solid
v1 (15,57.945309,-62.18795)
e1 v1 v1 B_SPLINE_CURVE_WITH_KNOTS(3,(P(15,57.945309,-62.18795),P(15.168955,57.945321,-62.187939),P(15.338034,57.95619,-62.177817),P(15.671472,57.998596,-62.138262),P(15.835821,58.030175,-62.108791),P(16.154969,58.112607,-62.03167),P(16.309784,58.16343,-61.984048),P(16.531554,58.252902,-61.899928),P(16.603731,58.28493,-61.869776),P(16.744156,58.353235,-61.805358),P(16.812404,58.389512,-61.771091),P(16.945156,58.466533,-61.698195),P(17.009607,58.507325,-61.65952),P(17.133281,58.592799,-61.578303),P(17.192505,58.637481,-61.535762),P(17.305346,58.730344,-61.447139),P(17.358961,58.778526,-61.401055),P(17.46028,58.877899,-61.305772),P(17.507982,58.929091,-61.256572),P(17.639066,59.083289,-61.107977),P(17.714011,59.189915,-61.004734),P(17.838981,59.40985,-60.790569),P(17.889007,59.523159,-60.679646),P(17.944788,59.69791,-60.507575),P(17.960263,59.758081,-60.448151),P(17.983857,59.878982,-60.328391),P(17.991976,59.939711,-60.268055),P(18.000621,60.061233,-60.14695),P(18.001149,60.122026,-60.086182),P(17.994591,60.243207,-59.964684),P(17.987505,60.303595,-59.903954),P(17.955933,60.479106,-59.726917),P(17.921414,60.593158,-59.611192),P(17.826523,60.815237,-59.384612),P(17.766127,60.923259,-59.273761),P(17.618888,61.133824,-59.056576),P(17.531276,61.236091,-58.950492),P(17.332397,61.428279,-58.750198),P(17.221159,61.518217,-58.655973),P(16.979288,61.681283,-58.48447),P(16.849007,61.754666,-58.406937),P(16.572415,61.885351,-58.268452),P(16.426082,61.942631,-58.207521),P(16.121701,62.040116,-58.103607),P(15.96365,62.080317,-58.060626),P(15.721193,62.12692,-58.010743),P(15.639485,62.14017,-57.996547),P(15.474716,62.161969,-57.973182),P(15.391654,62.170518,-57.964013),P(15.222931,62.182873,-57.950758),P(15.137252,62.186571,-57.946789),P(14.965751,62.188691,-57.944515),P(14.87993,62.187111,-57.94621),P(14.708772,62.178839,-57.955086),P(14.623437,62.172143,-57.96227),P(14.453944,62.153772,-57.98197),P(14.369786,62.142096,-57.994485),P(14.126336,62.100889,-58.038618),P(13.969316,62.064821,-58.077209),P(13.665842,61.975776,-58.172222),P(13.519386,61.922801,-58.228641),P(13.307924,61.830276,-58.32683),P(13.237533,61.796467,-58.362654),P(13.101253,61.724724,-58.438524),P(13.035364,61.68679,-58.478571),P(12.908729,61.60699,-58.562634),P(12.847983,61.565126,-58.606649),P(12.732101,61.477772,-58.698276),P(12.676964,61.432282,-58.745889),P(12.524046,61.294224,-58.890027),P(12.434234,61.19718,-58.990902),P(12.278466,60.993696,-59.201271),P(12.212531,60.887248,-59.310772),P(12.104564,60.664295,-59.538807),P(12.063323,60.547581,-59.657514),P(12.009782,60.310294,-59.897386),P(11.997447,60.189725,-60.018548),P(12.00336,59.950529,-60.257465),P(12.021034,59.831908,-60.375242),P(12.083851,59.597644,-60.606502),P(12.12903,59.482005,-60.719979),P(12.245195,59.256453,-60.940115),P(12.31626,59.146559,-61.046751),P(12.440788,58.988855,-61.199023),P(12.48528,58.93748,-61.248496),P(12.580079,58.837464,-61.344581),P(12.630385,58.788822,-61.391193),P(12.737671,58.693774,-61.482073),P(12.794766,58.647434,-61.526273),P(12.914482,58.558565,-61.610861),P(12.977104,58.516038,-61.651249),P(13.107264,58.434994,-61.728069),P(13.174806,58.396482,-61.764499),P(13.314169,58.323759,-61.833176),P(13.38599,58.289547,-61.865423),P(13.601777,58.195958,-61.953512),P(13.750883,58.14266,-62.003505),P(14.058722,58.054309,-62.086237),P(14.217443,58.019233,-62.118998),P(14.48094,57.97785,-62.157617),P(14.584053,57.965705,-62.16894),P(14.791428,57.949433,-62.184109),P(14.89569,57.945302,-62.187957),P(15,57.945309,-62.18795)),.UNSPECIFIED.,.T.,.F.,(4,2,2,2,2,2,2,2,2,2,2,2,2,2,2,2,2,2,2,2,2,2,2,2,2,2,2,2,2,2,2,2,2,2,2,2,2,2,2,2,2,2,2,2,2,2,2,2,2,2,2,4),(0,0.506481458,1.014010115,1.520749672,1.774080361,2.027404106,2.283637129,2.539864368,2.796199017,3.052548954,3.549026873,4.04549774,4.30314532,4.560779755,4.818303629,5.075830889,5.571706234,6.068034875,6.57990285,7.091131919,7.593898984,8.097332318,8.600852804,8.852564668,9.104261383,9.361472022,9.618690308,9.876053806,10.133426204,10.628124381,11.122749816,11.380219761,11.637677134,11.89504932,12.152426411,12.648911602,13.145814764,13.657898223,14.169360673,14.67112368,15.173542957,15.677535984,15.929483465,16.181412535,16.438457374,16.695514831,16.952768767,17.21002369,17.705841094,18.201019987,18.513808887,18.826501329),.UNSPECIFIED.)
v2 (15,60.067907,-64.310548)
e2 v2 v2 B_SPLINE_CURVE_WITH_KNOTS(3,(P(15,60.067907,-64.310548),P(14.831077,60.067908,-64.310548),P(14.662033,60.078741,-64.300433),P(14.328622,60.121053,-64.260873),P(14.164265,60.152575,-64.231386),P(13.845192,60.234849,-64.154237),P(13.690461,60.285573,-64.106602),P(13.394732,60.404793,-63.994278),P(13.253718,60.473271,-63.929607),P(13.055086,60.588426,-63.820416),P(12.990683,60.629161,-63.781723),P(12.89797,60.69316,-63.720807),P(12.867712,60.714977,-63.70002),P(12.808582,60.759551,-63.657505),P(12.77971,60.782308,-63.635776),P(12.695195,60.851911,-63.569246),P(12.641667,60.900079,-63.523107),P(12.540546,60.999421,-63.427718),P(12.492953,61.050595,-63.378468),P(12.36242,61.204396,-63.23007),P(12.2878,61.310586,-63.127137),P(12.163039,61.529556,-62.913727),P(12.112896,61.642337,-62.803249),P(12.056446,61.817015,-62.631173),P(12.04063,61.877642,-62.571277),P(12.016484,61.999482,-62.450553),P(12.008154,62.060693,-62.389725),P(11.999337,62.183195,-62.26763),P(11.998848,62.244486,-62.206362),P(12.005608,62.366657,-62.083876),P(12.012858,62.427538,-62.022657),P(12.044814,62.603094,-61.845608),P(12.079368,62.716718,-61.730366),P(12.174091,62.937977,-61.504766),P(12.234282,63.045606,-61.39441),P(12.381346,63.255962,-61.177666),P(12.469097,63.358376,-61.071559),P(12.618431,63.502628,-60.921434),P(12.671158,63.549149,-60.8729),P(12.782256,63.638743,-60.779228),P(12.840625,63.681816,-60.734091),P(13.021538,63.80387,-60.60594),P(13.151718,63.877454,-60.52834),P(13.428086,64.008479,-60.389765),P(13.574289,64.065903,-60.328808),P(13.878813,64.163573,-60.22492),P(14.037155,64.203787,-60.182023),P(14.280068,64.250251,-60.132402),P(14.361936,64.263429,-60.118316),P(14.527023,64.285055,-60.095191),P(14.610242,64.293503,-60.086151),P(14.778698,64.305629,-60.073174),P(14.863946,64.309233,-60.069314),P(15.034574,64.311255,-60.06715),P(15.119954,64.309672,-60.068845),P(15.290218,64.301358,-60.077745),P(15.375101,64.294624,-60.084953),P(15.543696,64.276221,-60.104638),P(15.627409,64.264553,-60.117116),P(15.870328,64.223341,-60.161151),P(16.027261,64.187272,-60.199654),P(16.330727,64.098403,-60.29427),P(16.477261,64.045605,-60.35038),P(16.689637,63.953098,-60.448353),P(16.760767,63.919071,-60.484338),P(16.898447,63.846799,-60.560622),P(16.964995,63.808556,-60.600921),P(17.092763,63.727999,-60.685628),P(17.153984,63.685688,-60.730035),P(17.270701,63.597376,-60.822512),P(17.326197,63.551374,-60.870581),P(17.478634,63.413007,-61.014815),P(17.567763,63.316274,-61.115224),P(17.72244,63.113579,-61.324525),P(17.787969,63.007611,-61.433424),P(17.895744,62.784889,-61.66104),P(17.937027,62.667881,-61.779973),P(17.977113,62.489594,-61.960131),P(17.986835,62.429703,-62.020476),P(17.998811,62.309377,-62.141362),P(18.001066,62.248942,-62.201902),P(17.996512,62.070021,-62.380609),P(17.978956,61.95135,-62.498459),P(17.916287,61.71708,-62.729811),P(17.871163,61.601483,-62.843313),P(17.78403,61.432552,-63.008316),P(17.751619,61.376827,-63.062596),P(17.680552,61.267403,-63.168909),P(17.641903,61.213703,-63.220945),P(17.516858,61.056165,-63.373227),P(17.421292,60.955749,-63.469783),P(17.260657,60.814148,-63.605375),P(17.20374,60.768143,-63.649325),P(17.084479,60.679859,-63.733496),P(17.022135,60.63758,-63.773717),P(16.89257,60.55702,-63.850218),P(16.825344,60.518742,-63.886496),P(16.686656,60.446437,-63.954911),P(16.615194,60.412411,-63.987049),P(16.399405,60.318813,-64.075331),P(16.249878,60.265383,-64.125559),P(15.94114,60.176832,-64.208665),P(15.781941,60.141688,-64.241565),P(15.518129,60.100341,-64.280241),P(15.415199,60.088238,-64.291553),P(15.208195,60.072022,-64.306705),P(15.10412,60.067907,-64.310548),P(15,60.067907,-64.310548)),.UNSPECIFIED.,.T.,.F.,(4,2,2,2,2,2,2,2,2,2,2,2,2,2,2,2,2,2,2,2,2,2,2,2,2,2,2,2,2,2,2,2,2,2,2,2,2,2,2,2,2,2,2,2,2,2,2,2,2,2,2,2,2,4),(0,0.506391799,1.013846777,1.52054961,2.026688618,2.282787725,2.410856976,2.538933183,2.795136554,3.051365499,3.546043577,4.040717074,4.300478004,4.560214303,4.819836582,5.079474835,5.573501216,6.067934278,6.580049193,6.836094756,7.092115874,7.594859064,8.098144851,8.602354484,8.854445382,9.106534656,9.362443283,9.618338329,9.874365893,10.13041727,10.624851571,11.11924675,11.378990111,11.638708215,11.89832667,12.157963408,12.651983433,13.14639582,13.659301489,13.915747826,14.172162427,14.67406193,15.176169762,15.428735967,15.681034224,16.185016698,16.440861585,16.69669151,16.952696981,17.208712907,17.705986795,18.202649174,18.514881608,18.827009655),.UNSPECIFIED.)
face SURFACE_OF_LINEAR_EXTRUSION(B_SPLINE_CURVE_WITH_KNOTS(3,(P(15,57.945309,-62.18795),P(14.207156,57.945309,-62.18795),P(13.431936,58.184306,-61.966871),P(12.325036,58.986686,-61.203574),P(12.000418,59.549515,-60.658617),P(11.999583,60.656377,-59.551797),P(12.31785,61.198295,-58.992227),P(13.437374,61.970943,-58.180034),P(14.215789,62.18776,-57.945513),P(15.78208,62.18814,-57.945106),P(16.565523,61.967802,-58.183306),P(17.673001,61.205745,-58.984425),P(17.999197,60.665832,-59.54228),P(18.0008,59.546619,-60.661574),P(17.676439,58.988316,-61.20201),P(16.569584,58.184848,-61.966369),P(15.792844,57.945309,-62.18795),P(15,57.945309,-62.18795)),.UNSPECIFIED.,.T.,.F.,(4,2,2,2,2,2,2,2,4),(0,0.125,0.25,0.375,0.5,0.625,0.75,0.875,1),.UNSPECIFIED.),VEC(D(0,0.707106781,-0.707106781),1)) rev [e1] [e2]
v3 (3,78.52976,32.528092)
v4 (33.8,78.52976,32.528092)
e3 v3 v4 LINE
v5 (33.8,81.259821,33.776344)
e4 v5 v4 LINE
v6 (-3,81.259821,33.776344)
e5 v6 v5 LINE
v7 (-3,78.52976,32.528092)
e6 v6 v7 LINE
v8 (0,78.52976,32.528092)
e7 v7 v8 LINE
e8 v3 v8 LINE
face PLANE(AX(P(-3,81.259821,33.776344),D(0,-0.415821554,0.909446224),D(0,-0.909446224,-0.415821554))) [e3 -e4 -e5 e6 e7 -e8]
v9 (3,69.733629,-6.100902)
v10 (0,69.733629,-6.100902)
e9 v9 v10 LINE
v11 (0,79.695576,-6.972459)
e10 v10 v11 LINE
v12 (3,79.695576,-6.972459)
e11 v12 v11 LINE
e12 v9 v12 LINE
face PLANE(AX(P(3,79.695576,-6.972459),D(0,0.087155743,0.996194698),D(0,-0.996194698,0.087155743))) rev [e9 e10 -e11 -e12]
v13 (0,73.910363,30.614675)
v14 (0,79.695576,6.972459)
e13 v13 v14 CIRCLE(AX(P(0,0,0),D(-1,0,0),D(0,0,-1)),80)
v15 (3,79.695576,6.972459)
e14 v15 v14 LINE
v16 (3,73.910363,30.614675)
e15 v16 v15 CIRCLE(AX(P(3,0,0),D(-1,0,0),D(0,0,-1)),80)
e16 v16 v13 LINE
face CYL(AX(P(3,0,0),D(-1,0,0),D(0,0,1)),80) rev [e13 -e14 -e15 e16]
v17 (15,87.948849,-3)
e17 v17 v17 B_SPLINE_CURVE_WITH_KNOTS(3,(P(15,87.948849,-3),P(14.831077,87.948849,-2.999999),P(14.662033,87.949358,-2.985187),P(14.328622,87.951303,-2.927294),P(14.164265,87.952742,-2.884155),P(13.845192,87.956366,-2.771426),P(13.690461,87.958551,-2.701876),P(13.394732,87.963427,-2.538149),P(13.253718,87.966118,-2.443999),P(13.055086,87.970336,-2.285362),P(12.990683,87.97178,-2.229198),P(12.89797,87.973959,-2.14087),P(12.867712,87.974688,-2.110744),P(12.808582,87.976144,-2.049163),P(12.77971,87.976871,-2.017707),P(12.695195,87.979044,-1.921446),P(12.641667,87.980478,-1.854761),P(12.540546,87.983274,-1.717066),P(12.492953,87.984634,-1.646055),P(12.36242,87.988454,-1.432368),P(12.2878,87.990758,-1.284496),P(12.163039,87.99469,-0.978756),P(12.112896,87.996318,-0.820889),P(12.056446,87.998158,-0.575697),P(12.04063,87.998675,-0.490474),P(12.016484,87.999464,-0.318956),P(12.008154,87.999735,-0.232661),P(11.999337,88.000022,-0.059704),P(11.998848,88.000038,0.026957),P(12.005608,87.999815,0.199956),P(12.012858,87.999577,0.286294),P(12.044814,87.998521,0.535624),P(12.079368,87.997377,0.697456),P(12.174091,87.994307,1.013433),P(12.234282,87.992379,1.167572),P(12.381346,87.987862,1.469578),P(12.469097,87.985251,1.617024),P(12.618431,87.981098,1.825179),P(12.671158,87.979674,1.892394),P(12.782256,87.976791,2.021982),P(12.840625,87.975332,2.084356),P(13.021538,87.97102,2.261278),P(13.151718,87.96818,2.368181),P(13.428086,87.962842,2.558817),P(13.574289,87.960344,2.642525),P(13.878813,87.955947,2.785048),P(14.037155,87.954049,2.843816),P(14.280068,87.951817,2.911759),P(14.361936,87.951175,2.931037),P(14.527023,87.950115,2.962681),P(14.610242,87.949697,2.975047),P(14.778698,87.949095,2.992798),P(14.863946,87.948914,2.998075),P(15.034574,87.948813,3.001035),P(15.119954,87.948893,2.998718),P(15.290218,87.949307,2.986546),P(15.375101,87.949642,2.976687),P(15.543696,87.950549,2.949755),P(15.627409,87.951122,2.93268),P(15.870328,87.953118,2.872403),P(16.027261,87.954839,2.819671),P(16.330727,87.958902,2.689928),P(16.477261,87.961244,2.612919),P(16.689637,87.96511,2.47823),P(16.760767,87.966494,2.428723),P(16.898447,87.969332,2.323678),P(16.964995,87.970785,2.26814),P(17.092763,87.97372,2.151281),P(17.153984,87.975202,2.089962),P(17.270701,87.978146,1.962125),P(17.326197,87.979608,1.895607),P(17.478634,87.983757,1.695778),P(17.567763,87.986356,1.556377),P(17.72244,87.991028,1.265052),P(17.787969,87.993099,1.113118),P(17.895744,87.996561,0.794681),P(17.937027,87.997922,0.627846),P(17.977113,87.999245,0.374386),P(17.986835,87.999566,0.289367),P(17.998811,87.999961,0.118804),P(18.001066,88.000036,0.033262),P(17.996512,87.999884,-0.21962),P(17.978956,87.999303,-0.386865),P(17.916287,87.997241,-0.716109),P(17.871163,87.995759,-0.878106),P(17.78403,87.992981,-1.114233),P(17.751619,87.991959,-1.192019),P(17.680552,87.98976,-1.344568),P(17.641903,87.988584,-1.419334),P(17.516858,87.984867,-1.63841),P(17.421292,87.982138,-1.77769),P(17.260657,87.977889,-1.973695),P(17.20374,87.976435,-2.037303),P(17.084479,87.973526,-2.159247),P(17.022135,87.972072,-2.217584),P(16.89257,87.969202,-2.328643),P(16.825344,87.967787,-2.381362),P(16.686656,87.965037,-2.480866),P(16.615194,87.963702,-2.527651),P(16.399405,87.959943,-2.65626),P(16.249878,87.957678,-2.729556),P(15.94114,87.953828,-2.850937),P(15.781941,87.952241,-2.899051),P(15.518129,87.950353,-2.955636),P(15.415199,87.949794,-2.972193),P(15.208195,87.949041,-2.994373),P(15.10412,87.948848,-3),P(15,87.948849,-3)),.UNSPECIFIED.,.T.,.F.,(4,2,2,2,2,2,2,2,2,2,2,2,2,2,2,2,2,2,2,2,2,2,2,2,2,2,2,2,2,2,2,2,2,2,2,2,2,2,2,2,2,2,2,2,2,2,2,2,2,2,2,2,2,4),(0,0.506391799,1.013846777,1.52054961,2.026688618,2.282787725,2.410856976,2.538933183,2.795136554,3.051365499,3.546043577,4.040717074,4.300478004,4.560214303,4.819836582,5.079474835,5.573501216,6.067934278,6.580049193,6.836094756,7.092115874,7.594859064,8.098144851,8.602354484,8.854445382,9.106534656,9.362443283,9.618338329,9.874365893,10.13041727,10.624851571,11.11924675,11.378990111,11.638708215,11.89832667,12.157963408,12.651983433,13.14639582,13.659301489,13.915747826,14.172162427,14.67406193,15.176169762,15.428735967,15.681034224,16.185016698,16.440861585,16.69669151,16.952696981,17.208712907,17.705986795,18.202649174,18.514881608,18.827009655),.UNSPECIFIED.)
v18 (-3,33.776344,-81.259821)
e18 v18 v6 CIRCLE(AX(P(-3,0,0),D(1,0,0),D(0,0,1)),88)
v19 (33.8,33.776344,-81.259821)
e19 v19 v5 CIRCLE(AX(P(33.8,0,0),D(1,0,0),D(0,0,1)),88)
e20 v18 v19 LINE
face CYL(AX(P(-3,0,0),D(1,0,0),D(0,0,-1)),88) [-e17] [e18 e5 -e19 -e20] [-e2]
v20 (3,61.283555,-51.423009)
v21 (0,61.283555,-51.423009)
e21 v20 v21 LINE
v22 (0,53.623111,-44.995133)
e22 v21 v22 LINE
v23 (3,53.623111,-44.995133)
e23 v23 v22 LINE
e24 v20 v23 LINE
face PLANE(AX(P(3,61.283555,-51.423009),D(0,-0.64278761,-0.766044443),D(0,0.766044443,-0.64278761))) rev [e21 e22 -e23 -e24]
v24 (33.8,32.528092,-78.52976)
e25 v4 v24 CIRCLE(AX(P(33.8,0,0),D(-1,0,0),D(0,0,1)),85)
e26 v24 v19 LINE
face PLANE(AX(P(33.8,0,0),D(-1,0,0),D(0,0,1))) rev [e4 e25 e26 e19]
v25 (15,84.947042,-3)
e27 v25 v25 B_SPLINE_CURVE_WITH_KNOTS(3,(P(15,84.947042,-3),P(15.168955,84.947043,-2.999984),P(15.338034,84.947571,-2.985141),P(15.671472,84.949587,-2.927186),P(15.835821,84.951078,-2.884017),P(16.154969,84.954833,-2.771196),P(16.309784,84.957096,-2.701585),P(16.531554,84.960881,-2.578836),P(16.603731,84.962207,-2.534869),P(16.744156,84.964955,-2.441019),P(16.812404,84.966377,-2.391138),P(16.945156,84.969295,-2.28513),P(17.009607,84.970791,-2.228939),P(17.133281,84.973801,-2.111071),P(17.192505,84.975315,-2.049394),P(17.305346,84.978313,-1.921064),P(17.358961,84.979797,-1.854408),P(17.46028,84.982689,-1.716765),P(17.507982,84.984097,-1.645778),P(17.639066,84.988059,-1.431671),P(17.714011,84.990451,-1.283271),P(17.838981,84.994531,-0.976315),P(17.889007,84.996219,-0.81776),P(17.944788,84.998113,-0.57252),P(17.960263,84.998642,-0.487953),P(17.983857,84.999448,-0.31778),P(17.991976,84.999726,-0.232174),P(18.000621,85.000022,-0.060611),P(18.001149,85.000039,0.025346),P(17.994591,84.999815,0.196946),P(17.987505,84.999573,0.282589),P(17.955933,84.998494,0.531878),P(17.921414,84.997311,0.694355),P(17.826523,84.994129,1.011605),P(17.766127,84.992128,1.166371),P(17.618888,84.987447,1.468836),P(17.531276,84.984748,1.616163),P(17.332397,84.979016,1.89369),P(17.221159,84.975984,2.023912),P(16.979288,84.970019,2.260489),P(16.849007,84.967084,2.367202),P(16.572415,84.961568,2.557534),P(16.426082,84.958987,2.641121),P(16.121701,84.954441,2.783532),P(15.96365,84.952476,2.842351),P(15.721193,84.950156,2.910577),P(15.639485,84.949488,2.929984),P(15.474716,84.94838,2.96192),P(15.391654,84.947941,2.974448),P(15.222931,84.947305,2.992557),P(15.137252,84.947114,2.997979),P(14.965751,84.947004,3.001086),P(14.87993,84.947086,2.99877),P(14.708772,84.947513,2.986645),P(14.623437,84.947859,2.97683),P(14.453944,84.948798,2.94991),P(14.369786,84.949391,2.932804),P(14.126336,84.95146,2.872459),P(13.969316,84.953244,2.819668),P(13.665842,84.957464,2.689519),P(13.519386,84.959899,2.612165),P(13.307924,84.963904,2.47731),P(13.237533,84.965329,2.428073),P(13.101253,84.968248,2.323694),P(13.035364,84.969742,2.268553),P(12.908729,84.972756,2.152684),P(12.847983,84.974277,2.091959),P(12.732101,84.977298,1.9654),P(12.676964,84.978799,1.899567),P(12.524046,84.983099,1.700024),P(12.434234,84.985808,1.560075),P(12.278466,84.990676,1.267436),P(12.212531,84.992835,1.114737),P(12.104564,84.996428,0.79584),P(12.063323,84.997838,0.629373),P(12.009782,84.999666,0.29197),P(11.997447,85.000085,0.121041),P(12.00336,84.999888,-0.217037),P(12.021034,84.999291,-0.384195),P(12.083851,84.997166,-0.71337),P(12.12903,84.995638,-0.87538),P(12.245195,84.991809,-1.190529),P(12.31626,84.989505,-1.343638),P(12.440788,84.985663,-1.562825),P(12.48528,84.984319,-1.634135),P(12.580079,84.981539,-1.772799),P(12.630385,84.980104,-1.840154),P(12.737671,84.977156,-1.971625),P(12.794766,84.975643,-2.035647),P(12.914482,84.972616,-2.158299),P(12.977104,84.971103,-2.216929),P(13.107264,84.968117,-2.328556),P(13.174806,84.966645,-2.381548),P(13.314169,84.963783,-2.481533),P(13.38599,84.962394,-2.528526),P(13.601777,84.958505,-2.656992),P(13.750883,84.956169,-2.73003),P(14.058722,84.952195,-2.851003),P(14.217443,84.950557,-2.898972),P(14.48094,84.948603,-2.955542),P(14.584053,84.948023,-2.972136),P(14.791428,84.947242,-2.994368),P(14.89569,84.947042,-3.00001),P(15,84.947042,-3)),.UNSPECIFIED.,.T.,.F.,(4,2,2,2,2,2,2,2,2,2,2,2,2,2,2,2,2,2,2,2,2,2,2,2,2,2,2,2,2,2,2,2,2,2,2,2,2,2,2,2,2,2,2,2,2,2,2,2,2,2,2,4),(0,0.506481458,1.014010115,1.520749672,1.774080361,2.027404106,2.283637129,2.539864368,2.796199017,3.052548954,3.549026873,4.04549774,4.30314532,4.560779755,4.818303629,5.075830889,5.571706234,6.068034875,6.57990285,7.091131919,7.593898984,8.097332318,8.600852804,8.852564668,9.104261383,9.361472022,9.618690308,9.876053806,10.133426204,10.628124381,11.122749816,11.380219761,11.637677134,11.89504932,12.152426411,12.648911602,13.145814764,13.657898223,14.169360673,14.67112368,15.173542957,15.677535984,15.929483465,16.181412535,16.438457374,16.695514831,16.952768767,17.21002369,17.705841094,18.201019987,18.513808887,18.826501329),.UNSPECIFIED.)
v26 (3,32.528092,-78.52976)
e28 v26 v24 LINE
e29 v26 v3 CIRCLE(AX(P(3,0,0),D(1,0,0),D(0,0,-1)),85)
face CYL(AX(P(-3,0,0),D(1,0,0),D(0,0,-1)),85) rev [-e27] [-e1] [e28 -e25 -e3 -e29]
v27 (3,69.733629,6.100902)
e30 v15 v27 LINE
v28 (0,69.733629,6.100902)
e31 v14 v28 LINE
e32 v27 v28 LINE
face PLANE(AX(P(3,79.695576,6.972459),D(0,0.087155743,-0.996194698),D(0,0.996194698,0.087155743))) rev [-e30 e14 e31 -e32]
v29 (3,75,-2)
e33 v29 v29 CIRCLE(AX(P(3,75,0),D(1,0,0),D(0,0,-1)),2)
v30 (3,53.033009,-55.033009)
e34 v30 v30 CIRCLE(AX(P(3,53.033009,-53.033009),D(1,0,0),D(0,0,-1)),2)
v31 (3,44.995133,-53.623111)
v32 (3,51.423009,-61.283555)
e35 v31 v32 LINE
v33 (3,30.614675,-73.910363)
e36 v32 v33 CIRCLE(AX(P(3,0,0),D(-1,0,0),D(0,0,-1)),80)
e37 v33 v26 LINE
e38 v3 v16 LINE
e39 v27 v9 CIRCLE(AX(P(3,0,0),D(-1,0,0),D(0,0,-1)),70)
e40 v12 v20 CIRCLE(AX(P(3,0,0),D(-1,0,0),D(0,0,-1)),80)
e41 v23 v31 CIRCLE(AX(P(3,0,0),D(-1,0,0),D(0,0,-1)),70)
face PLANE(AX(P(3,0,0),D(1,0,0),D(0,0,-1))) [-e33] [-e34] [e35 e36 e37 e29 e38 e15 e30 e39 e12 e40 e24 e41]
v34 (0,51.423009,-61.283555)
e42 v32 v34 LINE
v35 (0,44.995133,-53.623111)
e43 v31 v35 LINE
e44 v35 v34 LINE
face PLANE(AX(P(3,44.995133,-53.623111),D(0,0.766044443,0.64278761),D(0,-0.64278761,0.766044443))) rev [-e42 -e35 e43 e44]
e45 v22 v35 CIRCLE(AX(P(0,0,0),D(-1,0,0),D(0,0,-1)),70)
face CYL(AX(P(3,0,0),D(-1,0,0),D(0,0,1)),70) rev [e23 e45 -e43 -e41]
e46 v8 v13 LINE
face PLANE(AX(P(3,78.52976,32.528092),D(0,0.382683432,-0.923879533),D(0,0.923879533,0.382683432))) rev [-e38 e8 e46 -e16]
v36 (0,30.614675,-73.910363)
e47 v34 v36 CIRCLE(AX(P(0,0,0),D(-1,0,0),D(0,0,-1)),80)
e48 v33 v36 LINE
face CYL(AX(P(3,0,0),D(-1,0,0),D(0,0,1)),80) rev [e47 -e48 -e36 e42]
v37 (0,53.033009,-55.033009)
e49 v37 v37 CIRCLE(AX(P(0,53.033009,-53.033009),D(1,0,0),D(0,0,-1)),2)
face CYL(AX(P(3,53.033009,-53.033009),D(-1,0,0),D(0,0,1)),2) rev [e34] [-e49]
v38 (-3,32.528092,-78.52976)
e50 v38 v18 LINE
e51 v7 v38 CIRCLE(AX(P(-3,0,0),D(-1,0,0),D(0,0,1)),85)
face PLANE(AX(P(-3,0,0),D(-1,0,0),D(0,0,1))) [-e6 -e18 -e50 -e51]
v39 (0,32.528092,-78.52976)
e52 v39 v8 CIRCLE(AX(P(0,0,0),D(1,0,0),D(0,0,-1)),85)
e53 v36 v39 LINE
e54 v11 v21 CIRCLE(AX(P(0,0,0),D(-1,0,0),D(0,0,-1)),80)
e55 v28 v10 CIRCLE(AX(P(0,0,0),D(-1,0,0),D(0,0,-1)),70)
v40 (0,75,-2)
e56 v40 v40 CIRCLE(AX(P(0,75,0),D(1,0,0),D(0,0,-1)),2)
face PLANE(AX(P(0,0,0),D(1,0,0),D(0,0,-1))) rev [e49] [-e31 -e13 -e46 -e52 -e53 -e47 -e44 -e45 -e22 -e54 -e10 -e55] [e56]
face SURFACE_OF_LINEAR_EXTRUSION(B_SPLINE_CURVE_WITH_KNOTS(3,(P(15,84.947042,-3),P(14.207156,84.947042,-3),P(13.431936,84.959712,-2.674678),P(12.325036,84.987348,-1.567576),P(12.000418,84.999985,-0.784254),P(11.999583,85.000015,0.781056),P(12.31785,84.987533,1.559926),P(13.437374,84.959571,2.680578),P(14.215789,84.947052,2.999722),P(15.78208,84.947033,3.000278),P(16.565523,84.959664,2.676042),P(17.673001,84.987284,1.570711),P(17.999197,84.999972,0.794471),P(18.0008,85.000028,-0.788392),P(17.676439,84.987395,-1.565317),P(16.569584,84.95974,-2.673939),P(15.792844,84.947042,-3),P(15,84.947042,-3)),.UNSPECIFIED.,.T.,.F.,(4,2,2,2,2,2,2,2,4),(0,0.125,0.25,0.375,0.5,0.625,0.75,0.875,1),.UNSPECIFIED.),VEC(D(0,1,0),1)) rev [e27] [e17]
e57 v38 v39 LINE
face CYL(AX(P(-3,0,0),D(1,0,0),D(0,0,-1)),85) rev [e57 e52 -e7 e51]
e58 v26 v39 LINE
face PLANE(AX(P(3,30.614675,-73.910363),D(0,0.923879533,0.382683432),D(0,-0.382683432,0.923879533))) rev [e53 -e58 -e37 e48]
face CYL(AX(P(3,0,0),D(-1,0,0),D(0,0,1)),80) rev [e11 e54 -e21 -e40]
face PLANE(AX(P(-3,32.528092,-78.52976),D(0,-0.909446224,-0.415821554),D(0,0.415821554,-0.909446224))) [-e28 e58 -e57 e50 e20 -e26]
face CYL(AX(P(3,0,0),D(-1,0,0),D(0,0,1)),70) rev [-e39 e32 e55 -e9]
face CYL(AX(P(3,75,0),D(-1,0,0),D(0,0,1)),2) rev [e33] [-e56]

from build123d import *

# Parameters (mm, degrees)
SKETCH5_R                = 2
BOSS_EXTRUDE2_DEPTH      = 3
BOSS_EXTRUDE3_DEPTH      = 30.8
BOSS_EXTRUDE3_DEPTH_BACK = 6
CUT_EXTRUDE1_START       = 84.947042212
CUT_EXTRUDE1_DEPTH       = 3.052957992
CIRPATTERN1_COUNT        = 8


# Read off the part's stored shape, not the designer's step: Cut-Extrude1
with BuildPart() as part:
    # Sketch5 → Boss-Extrude2 (new body)
    with BuildSketch(Plane(origin=(0, 0, 0), x_dir=(0, 0, -1), z_dir=(1, 0, 0))):
        with BuildLine():
            Line((-32.528091751, 78.529760263), (-30.614674589, 73.910362601))
            ThreePointArc((-30.614674589, 73.910362601), (-19.014871386, 77.707365585), (-6.97245942, 79.695575847))
            Line((-6.97245942, 79.695575847), (-6.100901992, 69.733628866))
            ThreePointArc((-6.100901992, 69.733628866), (0, 70), (6.100901992, 69.733628866))
            Line((6.100901992, 69.733628866), (6.97245942, 79.695575847))
            ThreePointArc((6.97245942, 79.695575847), (30.614674589, 73.910362601), (51.423008775, 61.28355545))
            Line((51.423008775, 61.28355545), (44.995132678, 53.623111018))
            ThreePointArc((44.995132678, 53.623111018), (49.497474683, 49.497474683), (53.623111018, 44.995132678))
            Line((53.623111018, 44.995132678), (61.28355545, 51.423008775))
            ThreePointArc((61.28355545, 51.423008775), (68.392949654, 41.501860653), (73.910362601, 30.614674589))
            Line((73.910362601, 30.614674589), (78.529760263, 32.528091751))
            ThreePointArc((78.529760263, 32.528091751), (32.528091751, 78.529760263), (-32.528091751, 78.529760263))
        make_face()
        with Locations((0, 75)):
            Circle(SKETCH5_R, mode=Mode.SUBTRACT)
        with Locations((53.033008589, 53.033008589)):
            Circle(SKETCH5_R, mode=Mode.SUBTRACT)
    extrude(amount=BOSS_EXTRUDE2_DEPTH)

    # Sketch6 → Boss-Extrude3 (add, two sides: drawn at the far end of the back side and taken through both)
    with BuildSketch(Plane(origin=(3, 0, 0), x_dir=(0, 0, -1), z_dir=(1, 0, 0)).offset(-BOSS_EXTRUDE3_DEPTH_BACK)):
        with BuildLine():
            Line((-33.776344001, 81.259821474), (-32.528091751, 78.529760263))
            ThreePointArc((-32.528091751, 78.529760263), (32.528091751, 78.529760263), (78.529760263, 32.528091751))
            Line((78.529760263, 32.528091751), (81.259821474, 33.776344001))
            ThreePointArc((81.259821474, 33.776344001), (33.575888915, 81.342852689), (-33.776344001, 81.259821474))
        make_face()
    extrude(amount=BOSS_EXTRUDE3_DEPTH + BOSS_EXTRUDE3_DEPTH_BACK)

    # Cut-Extrude1 outline → Cut-Extrude1 (cut)
    with BuildSketch(Plane(origin=(0, 0, 0), x_dir=(1, 0, 0), z_dir=(0, 1, 0)).offset(CUT_EXTRUDE1_START)):
        with BuildLine():
            add(Edge.make_bspline(
                [(15, 3), (14.207155752, 3), (13.431935871, 2.67467752), (12.32503645, 1.56757614), (12.000417509, 0.784253557), (11.999583343, -0.781056107), (12.317849893, -1.559926049), (13.437373681, -2.680577823), (14.215788964, -2.999721613), (15.78207965, -3.000278008), (16.565523239, -2.676042446), (17.673000882, -1.570710817), (17.999196633, -0.794471212), (18.000800287, 0.788392407), (17.676438527, 1.565317466), (16.569584029, 2.673938655), (15.792844248, 3), (15, 3)],
                knots=[0, 0, 0, 0, 0.125, 0.125, 0.25, 0.25, 0.375, 0.375, 0.5, 0.5, 0.625, 0.625, 0.75, 0.75, 0.875, 0.875, 1, 1, 1, 1], degree=3))
        make_face()
    cut_extrude1 = extrude(amount=CUT_EXTRUDE1_DEPTH, mode=Mode.SUBTRACT)

    # CirPattern1: Cut-Extrude1 ×8 about axis, 6 skipped
    cirpattern1_axis = Axis((0, 0, 0), (1, 0, 0))
    add([cut_extrude1.rotate(cirpattern1_axis, i * 360 / CIRPATTERN1_COUNT) for i in range(1, CIRPATTERN1_COUNT) if i not in (1, 2, 3, 4, 5, 6)], mode=Mode.SUBTRACT)


solid = part.part
